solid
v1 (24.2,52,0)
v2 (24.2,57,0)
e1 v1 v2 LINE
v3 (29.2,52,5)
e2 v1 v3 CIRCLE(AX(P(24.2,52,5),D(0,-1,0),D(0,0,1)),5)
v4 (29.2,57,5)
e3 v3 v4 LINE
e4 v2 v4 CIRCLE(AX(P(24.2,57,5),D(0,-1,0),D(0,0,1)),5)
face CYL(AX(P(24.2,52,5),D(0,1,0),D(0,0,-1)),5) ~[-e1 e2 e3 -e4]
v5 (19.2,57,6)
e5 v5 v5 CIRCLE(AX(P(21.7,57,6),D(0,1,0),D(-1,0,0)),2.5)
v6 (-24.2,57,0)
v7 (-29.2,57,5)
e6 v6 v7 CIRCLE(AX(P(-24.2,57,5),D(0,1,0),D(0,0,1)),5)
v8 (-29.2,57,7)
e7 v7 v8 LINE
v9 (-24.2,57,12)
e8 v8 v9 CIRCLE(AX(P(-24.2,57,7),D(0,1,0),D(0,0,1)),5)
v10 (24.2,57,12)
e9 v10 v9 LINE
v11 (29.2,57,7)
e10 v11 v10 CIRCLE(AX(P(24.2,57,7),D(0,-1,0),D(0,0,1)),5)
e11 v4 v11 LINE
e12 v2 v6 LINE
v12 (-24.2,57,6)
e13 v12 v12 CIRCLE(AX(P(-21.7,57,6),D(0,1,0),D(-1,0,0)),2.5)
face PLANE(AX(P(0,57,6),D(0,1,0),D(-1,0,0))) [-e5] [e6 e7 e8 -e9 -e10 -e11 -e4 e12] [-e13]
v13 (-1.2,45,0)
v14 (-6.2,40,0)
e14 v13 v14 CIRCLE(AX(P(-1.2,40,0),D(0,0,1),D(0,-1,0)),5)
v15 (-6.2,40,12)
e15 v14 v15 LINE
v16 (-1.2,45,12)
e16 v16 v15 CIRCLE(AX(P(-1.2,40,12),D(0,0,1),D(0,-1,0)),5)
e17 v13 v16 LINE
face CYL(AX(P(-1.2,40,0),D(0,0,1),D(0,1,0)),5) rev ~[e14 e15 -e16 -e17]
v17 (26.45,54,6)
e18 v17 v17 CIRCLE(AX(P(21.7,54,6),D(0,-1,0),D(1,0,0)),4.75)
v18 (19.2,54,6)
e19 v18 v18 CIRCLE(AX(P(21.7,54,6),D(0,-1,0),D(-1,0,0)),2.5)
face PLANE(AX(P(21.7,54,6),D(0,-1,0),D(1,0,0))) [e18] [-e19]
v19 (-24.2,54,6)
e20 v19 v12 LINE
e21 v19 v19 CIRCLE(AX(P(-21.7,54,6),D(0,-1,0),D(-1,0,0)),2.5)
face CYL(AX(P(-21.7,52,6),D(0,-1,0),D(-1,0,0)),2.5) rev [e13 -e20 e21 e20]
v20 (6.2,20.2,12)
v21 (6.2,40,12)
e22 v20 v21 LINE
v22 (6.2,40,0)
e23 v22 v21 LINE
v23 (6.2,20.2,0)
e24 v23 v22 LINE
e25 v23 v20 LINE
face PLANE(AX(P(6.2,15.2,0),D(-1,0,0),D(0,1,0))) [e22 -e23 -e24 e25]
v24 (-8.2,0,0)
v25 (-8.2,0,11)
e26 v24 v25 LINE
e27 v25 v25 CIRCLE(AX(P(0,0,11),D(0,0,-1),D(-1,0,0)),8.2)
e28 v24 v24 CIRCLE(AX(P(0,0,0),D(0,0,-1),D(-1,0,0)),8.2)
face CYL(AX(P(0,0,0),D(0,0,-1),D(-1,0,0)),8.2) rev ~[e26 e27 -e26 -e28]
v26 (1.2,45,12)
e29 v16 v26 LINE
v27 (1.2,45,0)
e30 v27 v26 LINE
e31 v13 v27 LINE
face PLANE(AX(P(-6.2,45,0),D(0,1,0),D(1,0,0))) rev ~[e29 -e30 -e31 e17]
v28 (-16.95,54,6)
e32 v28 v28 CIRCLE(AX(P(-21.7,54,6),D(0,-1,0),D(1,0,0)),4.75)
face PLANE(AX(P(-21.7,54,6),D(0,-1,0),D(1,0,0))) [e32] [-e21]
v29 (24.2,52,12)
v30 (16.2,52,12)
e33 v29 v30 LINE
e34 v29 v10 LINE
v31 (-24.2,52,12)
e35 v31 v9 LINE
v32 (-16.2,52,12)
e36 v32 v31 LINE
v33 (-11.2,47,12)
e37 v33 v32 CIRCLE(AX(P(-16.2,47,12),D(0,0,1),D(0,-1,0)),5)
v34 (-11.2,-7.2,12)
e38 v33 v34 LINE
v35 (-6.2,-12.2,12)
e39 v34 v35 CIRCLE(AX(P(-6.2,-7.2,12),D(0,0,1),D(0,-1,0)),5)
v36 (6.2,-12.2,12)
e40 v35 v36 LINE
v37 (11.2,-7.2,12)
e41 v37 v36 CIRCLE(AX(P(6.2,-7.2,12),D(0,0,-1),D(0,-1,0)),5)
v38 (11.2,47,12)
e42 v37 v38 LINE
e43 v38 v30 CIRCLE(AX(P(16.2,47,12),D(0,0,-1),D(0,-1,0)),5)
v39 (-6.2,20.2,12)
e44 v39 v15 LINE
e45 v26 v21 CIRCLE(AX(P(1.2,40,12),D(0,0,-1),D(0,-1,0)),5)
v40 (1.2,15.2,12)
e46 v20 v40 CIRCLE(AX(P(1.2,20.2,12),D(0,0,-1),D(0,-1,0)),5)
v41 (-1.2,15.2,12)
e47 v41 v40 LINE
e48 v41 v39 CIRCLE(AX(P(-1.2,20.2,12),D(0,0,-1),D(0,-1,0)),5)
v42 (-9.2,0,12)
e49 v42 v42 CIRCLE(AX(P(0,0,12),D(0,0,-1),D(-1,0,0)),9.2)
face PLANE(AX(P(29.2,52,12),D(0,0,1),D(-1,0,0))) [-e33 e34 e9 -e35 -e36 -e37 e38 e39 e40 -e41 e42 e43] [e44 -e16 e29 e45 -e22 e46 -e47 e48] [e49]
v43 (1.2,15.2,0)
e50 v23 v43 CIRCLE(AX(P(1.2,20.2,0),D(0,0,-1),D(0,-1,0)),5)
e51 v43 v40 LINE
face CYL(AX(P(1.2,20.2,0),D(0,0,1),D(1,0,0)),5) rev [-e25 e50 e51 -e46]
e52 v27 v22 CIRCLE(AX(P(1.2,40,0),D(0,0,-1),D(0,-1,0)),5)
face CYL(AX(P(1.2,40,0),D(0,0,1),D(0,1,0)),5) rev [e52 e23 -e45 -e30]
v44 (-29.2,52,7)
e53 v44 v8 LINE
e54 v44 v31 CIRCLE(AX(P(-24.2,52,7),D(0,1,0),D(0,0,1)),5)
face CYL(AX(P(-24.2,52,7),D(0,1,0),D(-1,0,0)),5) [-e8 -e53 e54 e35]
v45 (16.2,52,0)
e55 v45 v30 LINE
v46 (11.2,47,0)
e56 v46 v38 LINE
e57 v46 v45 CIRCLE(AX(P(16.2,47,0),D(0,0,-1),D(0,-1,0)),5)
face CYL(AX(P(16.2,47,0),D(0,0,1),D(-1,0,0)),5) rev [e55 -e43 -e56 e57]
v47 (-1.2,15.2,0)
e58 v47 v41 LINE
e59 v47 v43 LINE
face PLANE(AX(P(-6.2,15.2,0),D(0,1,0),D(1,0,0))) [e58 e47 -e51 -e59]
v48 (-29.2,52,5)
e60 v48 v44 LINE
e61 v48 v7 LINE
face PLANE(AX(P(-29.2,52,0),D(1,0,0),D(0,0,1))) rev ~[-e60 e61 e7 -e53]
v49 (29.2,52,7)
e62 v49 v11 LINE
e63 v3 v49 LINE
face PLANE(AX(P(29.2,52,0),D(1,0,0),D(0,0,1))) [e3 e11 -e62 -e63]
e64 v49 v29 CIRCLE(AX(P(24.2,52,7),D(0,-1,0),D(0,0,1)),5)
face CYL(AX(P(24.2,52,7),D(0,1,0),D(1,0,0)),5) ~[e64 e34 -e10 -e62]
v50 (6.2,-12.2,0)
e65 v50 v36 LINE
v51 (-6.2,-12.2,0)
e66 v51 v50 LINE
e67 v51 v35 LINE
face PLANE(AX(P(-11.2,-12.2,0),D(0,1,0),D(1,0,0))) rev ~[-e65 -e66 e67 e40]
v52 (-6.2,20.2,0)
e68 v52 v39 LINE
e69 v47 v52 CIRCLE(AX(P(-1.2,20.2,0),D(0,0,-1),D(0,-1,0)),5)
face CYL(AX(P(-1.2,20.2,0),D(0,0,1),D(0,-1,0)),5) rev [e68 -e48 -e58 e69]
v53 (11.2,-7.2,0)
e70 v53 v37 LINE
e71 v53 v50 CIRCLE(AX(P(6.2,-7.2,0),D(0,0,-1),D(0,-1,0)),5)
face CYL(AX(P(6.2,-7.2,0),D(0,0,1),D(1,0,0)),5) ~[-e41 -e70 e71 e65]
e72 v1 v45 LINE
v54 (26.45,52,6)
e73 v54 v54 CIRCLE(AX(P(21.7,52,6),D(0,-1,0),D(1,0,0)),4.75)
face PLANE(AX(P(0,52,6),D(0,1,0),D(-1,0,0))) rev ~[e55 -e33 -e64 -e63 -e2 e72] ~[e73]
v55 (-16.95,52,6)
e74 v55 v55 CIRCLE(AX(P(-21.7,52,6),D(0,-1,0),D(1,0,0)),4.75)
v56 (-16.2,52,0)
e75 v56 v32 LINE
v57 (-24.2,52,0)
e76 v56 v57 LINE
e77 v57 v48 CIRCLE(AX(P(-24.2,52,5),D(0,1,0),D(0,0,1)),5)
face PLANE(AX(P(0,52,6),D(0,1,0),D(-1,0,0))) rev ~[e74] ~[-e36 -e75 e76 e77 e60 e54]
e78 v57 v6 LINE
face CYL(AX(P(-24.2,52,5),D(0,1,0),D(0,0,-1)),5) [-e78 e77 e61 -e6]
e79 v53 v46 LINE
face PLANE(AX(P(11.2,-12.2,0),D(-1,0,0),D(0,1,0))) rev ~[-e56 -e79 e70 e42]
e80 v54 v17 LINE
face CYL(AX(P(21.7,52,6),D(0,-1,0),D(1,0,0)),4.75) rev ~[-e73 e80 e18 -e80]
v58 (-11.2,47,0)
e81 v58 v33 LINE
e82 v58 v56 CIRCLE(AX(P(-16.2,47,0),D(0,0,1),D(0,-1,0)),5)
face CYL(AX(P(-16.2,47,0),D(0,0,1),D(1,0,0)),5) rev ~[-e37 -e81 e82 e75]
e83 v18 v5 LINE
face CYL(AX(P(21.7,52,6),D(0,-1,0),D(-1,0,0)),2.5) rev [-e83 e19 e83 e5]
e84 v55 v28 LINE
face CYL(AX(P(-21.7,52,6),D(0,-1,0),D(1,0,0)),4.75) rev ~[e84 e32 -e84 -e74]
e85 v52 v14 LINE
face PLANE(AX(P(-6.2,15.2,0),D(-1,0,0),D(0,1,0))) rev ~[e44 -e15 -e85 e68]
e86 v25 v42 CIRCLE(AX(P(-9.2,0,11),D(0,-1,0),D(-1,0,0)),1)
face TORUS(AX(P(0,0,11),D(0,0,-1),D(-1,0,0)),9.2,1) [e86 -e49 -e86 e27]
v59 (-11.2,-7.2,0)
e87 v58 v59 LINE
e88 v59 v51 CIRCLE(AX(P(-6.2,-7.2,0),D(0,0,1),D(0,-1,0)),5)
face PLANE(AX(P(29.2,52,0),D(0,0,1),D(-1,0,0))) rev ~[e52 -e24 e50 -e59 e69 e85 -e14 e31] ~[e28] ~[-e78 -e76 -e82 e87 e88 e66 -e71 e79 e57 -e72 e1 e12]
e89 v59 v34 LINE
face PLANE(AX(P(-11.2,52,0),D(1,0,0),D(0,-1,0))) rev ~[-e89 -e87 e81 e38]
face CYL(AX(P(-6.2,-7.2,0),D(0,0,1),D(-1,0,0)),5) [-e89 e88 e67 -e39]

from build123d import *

# Parameters (mm, degrees)
F0_W     = 12.4
F0_H     = 29.8
F1_DEPTH = 12
F2_W     = 58.4
F2_H     = 12
F2_R     = 2.5
F3_DEPTH = 5
F4_R     = 5
F5_R     = 5
F6_R     = 5
F7_R     = 4.75
F8_DEPTH = 2
F9_R     = 1
F10_R    = 5


# Not quite as in the source:
# - a feature names something its author has since deleted; it is built from what else it names


with BuildPart() as f1:
    # F0 (on Top) → F1 (new body)
    with BuildSketch(Plane.XY):
        with BuildLine():
            ThreePointArc((-8.2, 0), (0, 8.2), (8.2, 0))
            Line((8.2, 0), (11.2, 0))
            Line((11.2, 0), (11.2, 52))
            Line((11.2, 52), (0, 52))
            Line((0, 52), (-11.2, 52))
            Line((-11.2, 52), (-11.2, 0))
            Line((-11.2, 0), (-8.2, 0))
        make_face()
        with Locations((0, 30.1)):
            Rectangle(F0_W, F0_H, mode=Mode.SUBTRACT)
        with BuildLine():
            Line((11.2, 0), (8.2, 0))
            ThreePointArc((8.2, 0), (0, -8.2), (-8.2, 0))
            Line((-8.2, 0), (-11.2, 0))
            Line((-11.2, 0), (-11.2, -12.2))
            Line((-11.2, -12.2), (0, -12.2))
            Line((0, -12.2), (11.2, -12.2))
            Line((11.2, -12.2), (11.2, 0))
        make_face()
        with BuildLine():
            Line((11.2, 0), (8.2, 0))
            ThreePointArc((8.2, 0), (0, -8.2), (-8.2, 0))
            Line((-8.2, 0), (-11.2, 0))
            Line((-11.2, 0), (-11.2, -12.2))
            Line((-11.2, -12.2), (0, -12.2))
            Line((0, -12.2), (11.2, -12.2))
            Line((11.2, -12.2), (11.2, 0))
        make_face()
    extrude(amount=F1_DEPTH)

    # F2 (on face) → F3 (join)
    with BuildSketch(Plane(origin=(0, 52, 0), x_dir=(-1, 0, 0), z_dir=(0, 1, 0))):
        with Locations((0, 6)):
            Rectangle(F2_W, F2_H)
        with Locations((-21.7, 6)):
            Circle(F2_R, mode=Mode.SUBTRACT)
        with Locations((21.7, 6)):
            Circle(F2_R, mode=Mode.SUBTRACT)
    extrude(amount=F3_DEPTH)

    # F4
    f4_edges = [f1.edges().sort_by_distance(p)[0] for p in [
        (-11.2, -12.2, 6),
        (11.2, -12.2, 6),
    ]]
    fillet(f4_edges, radius=F4_R)

    # F5
    f5_edges = [f1.edges().sort_by_distance(p)[0] for p in [
        (11.2, 52, 6),
        (-11.2, 52, 6),
    ]]
    fillet(f5_edges, radius=F5_R)

    # F6
    f6_edges = [f1.edges().sort_by_distance(p)[0] for p in [
        (-29.2, 54.5, 12),
        (-29.2, 54.5, 0),
        (29.2, 54.5, 0),
        (29.2, 54.5, 12),
    ]]
    fillet(f6_edges, radius=F6_R)

    # F7 (on face) → F8 (cut)
    with BuildSketch(Plane.XZ.offset(-52)):
        with Locations((21.7, 6)):
            Circle(F7_R)
        with Locations((-21.7, 6)):
            Circle(F7_R)
    extrude(amount=-F8_DEPTH, mode=Mode.SUBTRACT)

    # F9
    f9_edges = [f1.edges().sort_by_distance(p)[0] for p in [
        (8.2, 0, 12),
    ]]
    fillet(f9_edges, radius=F9_R)

    # F10
    f10_edges = [f1.edges().sort_by_distance(p)[0] for p in [
        (-6.2, 45, 6),
        (6.2, 45, 6),
        (-6.2, 15.2, 6),
        (6.2, 15.2, 6),
    ]]
    fillet(f10_edges, radius=F10_R)


solid = f1.part
